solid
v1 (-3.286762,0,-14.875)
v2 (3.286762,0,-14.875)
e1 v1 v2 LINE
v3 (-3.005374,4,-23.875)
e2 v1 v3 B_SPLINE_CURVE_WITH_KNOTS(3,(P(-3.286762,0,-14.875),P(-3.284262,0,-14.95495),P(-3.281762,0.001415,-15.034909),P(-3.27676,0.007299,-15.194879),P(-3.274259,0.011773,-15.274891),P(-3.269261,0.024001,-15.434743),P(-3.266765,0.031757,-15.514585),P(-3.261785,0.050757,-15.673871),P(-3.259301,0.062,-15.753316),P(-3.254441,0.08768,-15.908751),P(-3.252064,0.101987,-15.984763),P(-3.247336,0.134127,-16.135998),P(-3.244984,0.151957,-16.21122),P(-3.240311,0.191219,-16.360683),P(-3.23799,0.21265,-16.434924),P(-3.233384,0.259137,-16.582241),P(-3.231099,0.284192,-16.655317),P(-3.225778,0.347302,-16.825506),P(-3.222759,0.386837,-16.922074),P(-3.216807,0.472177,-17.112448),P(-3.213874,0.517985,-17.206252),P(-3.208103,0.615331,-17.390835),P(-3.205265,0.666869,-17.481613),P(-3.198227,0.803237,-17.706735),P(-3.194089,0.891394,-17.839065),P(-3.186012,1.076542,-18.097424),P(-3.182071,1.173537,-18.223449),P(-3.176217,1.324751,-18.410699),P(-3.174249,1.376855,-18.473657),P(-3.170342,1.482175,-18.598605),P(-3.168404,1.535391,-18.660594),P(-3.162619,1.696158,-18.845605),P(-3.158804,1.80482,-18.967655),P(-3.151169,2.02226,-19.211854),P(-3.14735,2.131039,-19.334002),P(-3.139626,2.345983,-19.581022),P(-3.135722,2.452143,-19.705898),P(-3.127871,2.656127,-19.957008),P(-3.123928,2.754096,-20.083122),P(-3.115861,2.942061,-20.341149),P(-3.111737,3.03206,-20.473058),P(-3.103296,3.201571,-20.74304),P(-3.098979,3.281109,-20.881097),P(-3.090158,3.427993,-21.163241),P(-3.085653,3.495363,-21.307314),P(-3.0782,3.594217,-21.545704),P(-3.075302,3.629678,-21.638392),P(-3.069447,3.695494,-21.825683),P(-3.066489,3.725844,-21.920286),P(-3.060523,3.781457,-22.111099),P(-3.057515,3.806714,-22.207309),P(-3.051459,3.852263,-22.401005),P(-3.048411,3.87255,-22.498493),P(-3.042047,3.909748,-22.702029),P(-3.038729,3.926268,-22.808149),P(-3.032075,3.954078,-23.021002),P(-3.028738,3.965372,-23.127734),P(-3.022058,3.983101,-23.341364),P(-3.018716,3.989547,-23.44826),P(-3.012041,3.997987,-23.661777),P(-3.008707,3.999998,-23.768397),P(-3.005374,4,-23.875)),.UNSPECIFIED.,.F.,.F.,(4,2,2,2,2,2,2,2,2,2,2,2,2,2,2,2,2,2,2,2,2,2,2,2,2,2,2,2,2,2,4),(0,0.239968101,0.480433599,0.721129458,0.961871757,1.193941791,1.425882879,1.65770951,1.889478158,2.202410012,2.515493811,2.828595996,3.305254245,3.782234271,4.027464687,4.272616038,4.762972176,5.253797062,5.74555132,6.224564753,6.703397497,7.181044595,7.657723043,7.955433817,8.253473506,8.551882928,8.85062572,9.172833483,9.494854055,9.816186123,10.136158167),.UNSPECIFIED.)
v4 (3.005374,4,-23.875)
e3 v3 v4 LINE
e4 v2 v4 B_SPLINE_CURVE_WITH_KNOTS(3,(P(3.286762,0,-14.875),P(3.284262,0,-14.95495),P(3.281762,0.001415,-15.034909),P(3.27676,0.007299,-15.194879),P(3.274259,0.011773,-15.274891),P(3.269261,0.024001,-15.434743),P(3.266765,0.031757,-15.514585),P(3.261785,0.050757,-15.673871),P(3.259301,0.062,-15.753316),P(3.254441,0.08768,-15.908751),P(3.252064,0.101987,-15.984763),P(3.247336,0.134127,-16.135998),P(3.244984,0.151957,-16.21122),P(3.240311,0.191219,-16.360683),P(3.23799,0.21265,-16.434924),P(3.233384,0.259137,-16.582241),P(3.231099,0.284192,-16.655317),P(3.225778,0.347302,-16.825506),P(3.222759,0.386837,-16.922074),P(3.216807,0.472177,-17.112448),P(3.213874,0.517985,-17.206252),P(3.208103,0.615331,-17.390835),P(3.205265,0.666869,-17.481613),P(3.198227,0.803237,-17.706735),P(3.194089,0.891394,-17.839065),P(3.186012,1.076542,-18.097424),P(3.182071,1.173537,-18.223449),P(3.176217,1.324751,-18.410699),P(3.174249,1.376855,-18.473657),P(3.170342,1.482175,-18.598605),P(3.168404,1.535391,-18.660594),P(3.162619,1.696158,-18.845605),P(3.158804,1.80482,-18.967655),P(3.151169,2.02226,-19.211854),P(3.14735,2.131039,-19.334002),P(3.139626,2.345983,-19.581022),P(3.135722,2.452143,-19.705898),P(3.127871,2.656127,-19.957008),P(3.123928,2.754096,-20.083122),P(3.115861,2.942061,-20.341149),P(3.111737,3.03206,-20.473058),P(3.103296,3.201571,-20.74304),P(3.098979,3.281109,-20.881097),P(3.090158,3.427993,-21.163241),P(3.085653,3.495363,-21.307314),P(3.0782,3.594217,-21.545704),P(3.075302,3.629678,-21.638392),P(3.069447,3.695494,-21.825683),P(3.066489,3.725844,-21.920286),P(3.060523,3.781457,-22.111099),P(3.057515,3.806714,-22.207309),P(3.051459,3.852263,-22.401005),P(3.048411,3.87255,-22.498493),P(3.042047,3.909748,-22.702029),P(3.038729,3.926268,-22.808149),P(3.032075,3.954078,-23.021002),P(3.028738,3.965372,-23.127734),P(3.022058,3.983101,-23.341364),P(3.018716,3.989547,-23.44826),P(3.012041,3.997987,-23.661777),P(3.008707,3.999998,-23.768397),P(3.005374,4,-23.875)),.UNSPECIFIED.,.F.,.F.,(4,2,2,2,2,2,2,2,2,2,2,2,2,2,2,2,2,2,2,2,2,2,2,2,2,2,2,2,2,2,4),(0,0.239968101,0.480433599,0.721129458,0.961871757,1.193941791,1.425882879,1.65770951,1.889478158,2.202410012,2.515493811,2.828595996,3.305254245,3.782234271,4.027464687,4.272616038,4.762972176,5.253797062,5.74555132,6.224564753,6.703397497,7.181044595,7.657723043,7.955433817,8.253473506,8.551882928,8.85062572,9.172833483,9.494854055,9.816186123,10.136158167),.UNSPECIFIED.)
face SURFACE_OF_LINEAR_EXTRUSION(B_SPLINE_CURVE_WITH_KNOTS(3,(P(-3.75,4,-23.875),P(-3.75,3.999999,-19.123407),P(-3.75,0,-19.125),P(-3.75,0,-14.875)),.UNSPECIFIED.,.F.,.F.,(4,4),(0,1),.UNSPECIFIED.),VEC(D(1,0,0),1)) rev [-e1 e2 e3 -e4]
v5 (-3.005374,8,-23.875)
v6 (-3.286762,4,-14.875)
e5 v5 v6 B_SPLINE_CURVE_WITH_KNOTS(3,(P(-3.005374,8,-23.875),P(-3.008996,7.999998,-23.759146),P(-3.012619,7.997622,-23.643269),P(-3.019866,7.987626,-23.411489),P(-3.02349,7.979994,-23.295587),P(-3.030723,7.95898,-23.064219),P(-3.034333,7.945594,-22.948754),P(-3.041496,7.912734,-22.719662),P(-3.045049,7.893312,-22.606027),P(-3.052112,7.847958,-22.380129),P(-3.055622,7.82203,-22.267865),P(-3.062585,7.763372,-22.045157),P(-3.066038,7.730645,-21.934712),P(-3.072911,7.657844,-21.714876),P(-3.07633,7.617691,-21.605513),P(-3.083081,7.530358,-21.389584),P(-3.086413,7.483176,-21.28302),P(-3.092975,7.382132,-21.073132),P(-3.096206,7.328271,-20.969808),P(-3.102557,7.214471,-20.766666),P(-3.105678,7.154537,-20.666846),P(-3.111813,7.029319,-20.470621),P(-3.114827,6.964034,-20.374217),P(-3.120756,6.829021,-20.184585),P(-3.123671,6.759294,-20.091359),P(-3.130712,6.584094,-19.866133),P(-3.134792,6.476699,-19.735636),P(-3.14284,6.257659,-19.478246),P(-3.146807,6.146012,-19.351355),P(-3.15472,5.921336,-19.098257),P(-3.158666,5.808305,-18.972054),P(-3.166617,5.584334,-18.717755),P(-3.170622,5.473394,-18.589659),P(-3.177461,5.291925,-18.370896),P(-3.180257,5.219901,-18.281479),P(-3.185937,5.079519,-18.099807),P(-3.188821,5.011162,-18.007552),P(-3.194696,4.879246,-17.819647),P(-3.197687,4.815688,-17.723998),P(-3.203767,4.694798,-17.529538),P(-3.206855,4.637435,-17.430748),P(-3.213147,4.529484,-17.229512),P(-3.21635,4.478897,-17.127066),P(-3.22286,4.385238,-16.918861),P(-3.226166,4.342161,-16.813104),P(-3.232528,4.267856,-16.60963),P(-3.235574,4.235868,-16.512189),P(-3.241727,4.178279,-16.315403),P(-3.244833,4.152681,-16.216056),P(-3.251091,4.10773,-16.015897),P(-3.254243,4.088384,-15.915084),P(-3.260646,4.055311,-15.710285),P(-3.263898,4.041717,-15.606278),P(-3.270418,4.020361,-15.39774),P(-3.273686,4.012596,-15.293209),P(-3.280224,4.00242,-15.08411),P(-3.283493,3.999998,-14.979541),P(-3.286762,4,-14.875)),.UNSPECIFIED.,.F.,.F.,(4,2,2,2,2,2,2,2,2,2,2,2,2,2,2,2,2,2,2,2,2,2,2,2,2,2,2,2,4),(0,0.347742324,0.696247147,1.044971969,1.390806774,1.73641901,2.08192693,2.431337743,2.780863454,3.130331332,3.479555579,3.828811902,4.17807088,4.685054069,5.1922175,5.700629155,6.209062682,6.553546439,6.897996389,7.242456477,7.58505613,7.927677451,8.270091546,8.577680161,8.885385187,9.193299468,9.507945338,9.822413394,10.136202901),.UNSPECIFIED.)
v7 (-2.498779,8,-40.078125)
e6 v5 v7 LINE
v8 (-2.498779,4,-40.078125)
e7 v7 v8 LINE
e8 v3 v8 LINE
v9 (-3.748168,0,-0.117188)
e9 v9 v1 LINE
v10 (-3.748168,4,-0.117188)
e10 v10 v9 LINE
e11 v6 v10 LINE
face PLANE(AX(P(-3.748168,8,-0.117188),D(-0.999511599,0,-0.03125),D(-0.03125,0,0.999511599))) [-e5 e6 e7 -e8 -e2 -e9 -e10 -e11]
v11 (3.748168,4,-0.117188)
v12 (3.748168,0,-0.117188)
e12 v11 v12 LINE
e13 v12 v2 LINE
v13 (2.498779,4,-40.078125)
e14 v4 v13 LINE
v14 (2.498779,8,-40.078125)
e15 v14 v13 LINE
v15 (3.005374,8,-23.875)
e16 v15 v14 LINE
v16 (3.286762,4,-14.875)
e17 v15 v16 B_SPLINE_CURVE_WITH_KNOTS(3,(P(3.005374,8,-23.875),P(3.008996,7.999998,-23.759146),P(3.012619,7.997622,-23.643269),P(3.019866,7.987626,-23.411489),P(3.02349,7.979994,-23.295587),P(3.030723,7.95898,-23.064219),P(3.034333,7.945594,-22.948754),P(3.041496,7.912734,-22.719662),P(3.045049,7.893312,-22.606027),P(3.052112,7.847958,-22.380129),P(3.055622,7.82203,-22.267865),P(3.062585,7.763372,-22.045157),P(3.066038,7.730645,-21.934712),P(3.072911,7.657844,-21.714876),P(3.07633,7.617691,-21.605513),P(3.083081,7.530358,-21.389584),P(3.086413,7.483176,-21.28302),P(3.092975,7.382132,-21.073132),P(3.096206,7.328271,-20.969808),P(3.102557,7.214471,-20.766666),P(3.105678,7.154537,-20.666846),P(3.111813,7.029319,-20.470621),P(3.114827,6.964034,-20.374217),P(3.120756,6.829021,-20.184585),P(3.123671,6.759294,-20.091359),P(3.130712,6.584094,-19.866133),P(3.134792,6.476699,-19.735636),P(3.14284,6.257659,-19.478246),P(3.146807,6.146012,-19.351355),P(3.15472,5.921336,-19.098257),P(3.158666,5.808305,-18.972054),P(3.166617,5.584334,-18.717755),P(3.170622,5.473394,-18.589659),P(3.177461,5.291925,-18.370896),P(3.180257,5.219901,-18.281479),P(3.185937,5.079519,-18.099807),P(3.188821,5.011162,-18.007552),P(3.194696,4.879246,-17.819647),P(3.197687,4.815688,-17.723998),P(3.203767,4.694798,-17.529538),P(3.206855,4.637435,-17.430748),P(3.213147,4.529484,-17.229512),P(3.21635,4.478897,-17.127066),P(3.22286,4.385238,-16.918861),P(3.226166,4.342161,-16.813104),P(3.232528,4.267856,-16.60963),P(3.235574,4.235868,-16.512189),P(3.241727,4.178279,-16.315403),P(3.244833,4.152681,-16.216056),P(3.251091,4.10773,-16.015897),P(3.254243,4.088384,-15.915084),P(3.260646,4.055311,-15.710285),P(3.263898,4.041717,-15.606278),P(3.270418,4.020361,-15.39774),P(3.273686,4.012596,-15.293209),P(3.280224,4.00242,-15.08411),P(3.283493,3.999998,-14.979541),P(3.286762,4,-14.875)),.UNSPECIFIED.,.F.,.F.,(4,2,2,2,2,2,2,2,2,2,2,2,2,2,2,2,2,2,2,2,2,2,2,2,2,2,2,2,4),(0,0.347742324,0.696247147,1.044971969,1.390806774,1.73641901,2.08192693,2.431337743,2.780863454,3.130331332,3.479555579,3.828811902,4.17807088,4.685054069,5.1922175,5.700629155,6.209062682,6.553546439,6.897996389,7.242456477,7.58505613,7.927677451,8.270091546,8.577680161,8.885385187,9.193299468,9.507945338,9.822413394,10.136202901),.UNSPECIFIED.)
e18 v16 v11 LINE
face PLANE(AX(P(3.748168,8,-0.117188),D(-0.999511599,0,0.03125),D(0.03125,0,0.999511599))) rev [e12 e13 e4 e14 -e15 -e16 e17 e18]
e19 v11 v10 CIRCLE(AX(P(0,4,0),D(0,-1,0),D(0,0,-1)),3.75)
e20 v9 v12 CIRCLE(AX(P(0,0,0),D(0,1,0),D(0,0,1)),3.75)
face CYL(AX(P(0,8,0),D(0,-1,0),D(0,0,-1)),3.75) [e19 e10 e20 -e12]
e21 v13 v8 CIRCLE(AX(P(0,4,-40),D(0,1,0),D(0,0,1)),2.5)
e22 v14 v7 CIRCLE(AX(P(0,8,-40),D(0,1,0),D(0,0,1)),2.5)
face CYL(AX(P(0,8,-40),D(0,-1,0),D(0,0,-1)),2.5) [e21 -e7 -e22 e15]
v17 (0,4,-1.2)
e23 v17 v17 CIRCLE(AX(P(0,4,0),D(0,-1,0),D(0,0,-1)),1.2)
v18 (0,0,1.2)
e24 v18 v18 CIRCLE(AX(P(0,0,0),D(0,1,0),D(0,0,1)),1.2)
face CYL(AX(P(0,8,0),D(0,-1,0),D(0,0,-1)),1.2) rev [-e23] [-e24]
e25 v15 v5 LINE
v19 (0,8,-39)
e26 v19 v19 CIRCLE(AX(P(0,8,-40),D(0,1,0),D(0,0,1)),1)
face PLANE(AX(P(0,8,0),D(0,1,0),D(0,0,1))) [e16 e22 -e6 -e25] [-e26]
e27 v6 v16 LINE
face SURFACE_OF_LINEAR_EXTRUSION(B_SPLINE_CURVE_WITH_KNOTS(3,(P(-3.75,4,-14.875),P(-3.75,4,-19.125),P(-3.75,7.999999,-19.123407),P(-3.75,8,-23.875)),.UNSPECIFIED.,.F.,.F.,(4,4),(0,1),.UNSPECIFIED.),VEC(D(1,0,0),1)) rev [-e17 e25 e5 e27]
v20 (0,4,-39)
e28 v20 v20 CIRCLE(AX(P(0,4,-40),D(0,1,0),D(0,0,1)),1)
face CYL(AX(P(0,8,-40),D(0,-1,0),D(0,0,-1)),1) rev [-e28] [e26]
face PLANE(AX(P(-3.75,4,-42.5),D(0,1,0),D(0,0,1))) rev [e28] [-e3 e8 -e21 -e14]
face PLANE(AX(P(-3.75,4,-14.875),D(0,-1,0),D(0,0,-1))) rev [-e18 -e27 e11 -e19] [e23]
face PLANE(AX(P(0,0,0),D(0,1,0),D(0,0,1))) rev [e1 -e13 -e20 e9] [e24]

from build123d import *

# Parameters (mm, degrees)
SKETCH1_R               = 1.2
SKETCH1_R_2             = 1
BOSS_EXTRUDE1_DEPTH     = 8
CUT_EXTRUDE7_DEPTH      = 44.408668489
CUT_EXTRUDE7_DEPTH_BACK = 44.408668489


with BuildPart() as part:
    # Sketch1 → Boss-Extrude1 (new body)
    with BuildSketch(Plane(origin=(0, 0, 0), x_dir=(1, 0, 0), z_dir=(0, 1, 0))):
        with BuildLine():
            Line((3.748168498, 0.1171875), (2.498778999, 40.078125))
            ThreePointArc((2.498778999, 40.078125), (0, 42.5), (-2.498778999, 40.078125))
            Line((-2.498778999, 40.078125), (-3.748168498, 0.1171875))
            ThreePointArc((-3.748168498, 0.1171875), (0, -3.75), (3.748168498, 0.1171875))
        make_face()
        Circle(SKETCH1_R, mode=Mode.SUBTRACT)
        with Locations((0, 40)):
            Circle(SKETCH1_R_2, mode=Mode.SUBTRACT)
    extrude(amount=BOSS_EXTRUDE1_DEPTH)

    # Sketch4 → Cut-Extrude7 (cut, two sides: drawn at the far end of the back side and taken through both)
    with BuildSketch(Plane(origin=(0, 0, 0), x_dir=(0, 0, -1), z_dir=(1, 0, 0)).offset(-CUT_EXTRUDE7_DEPTH_BACK)):
        with BuildLine():
            Line((42.5, 4), (23.875, 4))
            add(Edge.make_bspline(
                [(14.875, 0), (19.125, 0), (19.123406576, 3.999999238), (23.875, 4)],
                knots=[0, 0, 0, 0, 1, 1, 1, 1], degree=3))
            ThreePointArc((14.875, 0), (31.025432495, -14.146346291), (42.5, 4))
        make_face()
        with BuildLine():
            Line((14.875, 4), (-3.75, 4))
            ThreePointArc((-3.75, 4), (8.0625, 19.8125), (23.875, 8))
            add(Edge.make_bspline(
                [(14.875, 4), (19.125, 4), (19.123406576, 7.999999238), (23.875, 8)],
                knots=[0, 0, 0, 0, 1, 1, 1, 1], degree=3))
        make_face()
    extrude(amount=CUT_EXTRUDE7_DEPTH + CUT_EXTRUDE7_DEPTH_BACK, mode=Mode.SUBTRACT)


solid = part.part
